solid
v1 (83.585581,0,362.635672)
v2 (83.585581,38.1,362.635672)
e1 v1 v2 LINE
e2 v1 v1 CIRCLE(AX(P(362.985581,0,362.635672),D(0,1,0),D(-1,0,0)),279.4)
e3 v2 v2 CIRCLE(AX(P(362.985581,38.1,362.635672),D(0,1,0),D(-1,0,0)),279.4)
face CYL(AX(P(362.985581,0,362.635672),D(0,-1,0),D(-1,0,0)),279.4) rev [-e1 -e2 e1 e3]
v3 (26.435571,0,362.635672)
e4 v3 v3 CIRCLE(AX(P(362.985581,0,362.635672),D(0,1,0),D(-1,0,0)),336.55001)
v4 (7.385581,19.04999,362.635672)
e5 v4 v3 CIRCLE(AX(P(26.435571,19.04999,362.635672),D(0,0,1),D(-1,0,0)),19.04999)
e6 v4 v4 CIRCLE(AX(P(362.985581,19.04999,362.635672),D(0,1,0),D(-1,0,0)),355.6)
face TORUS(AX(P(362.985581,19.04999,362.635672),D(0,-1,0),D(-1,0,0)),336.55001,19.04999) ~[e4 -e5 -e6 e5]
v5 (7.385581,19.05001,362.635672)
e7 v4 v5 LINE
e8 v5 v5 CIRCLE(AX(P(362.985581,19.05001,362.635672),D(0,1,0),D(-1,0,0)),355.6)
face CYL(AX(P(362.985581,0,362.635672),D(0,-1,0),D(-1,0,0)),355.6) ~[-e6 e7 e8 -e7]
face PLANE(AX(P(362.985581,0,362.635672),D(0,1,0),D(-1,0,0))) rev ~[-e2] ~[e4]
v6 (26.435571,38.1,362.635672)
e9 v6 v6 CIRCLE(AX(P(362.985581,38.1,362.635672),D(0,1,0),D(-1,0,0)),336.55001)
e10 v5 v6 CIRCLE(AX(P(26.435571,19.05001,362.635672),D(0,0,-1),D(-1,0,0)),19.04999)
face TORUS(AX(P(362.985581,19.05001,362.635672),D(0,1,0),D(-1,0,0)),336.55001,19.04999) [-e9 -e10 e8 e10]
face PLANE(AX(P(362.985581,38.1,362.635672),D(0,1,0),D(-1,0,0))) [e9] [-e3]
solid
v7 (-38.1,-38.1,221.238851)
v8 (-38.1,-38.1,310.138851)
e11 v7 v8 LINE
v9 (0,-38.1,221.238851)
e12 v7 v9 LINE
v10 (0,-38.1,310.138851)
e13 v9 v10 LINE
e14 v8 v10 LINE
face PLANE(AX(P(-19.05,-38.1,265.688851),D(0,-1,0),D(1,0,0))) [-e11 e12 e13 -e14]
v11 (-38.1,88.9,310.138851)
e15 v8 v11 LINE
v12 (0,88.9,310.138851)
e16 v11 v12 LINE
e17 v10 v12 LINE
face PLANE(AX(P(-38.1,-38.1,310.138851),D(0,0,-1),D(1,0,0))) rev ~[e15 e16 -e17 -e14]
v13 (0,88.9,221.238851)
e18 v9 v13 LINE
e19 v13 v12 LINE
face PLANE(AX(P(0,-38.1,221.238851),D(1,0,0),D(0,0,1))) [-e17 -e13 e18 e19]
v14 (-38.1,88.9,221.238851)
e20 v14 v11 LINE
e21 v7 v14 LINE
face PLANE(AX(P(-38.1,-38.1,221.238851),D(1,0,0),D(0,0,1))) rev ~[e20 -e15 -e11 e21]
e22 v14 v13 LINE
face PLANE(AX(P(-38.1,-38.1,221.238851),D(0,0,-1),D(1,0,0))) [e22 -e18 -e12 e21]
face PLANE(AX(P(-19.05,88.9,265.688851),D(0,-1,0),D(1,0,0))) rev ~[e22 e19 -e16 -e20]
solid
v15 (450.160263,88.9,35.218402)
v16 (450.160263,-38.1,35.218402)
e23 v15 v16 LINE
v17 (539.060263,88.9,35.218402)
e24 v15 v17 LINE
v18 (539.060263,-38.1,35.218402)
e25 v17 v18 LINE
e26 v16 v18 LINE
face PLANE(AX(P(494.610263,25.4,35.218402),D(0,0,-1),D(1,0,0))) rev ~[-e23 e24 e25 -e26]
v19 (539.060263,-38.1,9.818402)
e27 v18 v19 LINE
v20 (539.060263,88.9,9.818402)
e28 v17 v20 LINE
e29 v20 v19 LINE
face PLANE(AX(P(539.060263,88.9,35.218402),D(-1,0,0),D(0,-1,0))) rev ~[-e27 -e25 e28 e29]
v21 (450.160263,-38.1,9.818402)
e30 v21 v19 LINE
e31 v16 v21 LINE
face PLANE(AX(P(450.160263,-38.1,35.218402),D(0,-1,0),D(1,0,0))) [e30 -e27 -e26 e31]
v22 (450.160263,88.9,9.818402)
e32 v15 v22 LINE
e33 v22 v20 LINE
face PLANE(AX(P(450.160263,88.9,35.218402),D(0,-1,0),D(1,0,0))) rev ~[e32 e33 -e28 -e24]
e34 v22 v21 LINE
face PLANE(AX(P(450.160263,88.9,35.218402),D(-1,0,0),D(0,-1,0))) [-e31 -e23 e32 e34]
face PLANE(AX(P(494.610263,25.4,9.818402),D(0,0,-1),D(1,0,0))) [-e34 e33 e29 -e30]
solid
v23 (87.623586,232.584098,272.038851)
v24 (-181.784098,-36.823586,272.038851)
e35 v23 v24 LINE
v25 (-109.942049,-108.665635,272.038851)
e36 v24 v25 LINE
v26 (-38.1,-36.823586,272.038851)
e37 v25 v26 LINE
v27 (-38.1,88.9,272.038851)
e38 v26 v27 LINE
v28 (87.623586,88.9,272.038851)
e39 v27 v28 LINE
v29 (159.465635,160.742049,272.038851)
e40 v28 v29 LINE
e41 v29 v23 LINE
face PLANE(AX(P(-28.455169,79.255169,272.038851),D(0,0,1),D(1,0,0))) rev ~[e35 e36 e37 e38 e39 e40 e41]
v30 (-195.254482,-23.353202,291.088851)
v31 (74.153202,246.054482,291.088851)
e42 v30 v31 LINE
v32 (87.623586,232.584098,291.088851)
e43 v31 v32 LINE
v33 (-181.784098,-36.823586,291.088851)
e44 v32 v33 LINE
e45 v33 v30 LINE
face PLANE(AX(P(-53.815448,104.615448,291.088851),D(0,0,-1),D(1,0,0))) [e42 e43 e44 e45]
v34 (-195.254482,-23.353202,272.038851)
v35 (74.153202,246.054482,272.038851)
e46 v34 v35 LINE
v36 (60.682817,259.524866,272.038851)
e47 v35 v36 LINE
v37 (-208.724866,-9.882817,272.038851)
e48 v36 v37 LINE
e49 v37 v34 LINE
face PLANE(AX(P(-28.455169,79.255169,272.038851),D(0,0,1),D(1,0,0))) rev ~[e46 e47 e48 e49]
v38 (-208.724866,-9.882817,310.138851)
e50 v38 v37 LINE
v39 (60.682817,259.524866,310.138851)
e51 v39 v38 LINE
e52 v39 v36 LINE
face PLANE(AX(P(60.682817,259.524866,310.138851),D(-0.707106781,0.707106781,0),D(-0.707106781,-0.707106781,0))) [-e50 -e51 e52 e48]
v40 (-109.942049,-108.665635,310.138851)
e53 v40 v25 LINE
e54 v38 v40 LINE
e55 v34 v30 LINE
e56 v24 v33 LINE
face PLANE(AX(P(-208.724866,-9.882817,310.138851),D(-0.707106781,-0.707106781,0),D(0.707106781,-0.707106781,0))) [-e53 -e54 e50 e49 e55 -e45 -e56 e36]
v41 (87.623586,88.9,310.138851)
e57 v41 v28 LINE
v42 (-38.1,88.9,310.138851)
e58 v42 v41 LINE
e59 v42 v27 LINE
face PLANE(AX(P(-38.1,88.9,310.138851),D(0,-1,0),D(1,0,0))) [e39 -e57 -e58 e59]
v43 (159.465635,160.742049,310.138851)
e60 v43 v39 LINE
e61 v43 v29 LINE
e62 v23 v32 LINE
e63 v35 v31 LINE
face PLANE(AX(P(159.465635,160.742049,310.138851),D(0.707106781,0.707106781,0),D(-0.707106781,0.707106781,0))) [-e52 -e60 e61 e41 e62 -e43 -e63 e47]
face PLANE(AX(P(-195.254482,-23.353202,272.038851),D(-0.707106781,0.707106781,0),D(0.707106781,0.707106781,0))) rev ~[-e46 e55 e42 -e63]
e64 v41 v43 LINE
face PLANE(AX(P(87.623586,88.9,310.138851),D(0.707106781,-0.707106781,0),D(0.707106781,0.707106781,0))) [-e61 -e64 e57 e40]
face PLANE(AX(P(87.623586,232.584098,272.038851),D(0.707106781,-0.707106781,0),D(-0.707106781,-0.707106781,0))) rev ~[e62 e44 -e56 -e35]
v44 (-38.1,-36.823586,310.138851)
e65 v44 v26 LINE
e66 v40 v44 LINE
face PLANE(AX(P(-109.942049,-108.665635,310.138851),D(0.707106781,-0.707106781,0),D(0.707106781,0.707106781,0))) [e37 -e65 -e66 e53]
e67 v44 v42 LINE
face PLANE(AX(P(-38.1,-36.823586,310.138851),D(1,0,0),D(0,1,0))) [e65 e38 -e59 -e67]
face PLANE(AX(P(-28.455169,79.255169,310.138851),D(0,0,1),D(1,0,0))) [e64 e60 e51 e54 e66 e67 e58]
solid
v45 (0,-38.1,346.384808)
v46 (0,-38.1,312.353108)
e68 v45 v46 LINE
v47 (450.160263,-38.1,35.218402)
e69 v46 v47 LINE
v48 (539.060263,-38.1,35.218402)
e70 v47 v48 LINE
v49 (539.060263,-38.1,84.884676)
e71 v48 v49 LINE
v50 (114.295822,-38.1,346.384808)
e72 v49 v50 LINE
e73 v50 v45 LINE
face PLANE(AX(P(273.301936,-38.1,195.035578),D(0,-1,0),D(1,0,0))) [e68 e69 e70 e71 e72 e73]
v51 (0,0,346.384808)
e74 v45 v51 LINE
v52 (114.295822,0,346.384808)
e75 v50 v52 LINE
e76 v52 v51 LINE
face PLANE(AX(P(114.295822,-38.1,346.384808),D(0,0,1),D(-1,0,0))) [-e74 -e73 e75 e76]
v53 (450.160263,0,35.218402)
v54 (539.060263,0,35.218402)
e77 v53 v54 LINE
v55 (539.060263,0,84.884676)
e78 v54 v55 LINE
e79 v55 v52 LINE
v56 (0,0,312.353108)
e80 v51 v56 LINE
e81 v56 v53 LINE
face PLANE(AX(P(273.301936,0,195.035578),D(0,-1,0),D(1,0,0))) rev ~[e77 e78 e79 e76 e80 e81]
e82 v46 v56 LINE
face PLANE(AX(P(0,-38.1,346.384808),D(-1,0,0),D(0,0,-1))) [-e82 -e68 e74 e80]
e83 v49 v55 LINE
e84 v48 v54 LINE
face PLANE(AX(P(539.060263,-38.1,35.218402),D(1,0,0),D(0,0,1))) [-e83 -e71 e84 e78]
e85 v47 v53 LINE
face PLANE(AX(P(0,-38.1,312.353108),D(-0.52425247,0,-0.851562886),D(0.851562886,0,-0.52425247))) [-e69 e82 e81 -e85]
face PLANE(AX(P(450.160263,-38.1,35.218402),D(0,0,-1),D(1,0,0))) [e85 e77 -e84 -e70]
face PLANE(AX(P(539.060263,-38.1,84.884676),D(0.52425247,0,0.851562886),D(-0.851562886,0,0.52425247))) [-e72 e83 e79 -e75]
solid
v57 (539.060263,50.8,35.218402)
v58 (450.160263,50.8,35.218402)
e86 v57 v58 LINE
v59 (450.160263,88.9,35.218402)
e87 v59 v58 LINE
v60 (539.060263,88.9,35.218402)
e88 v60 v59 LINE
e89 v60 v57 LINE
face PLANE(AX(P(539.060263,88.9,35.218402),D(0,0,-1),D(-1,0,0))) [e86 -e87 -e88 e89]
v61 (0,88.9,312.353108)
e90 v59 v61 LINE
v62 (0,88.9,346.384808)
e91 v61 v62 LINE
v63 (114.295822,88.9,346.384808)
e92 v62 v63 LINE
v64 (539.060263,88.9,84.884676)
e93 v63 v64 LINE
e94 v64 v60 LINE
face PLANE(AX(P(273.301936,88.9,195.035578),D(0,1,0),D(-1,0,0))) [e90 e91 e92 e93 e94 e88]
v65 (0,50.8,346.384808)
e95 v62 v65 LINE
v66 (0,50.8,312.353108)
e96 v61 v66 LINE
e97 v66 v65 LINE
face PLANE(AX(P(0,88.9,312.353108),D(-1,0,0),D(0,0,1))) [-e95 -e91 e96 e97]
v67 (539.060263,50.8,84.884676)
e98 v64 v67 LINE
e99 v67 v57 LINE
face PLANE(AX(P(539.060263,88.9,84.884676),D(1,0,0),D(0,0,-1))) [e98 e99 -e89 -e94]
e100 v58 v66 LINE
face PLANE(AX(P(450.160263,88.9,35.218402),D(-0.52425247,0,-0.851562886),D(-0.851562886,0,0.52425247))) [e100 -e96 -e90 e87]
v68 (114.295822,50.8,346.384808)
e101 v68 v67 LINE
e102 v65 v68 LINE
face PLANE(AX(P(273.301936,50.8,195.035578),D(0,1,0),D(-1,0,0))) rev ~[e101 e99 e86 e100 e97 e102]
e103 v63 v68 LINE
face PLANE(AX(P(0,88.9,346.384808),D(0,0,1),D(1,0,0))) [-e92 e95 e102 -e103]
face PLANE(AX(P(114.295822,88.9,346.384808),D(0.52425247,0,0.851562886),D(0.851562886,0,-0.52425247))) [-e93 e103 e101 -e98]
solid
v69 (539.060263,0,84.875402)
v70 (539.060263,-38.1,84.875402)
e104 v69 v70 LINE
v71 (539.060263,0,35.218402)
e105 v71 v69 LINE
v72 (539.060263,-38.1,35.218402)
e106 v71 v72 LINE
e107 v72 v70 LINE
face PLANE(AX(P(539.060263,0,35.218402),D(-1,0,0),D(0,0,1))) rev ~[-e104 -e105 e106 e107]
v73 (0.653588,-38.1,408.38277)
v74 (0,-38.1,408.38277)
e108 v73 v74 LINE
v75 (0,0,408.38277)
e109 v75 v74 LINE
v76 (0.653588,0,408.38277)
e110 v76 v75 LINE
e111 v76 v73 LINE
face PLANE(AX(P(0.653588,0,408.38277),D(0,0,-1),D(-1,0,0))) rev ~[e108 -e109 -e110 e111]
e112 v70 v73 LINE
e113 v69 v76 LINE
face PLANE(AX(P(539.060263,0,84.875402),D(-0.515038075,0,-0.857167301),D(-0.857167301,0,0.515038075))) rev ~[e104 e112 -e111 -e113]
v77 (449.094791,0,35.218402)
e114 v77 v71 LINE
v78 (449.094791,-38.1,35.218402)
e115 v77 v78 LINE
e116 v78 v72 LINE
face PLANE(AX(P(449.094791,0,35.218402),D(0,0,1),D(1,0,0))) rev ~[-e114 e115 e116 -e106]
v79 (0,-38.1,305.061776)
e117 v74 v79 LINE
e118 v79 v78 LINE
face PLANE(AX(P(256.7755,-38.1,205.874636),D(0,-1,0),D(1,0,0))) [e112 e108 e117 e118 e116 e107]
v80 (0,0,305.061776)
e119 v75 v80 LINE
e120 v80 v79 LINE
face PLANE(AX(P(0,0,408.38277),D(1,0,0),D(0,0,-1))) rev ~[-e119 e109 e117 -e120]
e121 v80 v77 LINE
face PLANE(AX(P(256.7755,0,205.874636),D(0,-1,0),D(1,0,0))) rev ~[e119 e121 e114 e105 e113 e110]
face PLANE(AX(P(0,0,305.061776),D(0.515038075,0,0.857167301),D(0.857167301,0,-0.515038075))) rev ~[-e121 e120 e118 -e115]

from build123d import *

# Parameters (mm, degrees)
F1_DEPTH  = 38.1
F2_W      = 88.9
F2_H      = 127
F3_DEPTH  = 25.4
F5_W      = 38.1
F5_H      = 88.9
F6_DEPTH  = 127
F8_R      = 355.6
F8_R_2    = 279.4
F9_DEPTH  = 38.1
F10_R     = 19.04999
F12_DEPTH = 38.1
F14_DEPTH = 19.05
F16_DEPTH = 38.1
F19_DEPTH = 38.1


# Not quite as in the source:
# - a fillet or chamfer is up to 0.001 mm smaller than in the source, because OpenCascade refuses the exact size


with BuildPart() as f1:
    # F0 (on Front) → F1 (new body)
    with BuildSketch(Plane.XZ):
        Polygon((0, 305.0617762964), (449.0947908261, 35.2184022785), (539.0602625189, 35.2184022785), (539.0602625189, 84.8754022785), (0.6535882854, 408.382769847), (0, 408.382769847), align=None)
    extrude(amount=F1_DEPTH)


with BuildPart() as f3:
    # F2 (on face) → F3 (new body)
    with BuildSketch(Plane(origin=(0, 0, 35.2184022785), x_dir=(1, 0, 0), z_dir=(0, 0, -1))):
        with Locations((494.6102625189, -25.4)):
            Rectangle(F2_W, F2_H)
    extrude(amount=F3_DEPTH)


with BuildPart() as f6:
    # F5 (on face) → F6 (new body)
    with BuildSketch(Plane.XZ.offset(38.1)):
        with Locations((-19.05, 265.6888514042)):
            Rectangle(F5_W, F5_H)
    extrude(amount=-F6_DEPTH)


with BuildPart() as f9:
    # F8 (on face) → F9 (new body)
    with BuildSketch(Plane(origin=(0, 0, 0), x_dir=(-1, 0, 0), z_dir=(0, 1, 0))):
        with Locations((-362.9855811596, 362.6356720924)):
            Circle(F8_R)
        with Locations((-362.9855811596, 362.6356720924)):
            Circle(F8_R_2, mode=Mode.SUBTRACT)
    extrude(amount=F9_DEPTH)

    # F10 (radius 19.05 in the source; OpenCascade refuses exactly that, so slightly less here)
    f10_edges = [f9.edges().sort_by_distance(p)[0] for p in [
        (718.585581, 0, 362.635672),
        (718.585581, 38.1, 362.635672),
    ]]
    fillet(f10_edges, radius=F10_R)


with BuildPart() as f12:
    # F11 (on face) → F12 (new body)
    with BuildSketch(Plane.XY.offset(310.1388514042)):
        Polygon((60.6828173318, 259.5248663003), (-208.7248663003, -9.8828173318), (-109.9420489686, -108.6656346635), (-38.1, -36.823585695), (-38.1, 88.9), (87.623585695, 88.9), (159.4656346635, 160.7420489686), align=None)
    extrude(amount=-F12_DEPTH)

    # F13 (on face) → F14 (cut)
    with BuildSketch(Plane(origin=(0, 0, 272.0388514042), x_dir=(1, 0, 0), z_dir=(0, 0, -1))):
        Polygon((-181.7840979371, 36.823585695), (-195.2544821187, 23.3532015134), (74.1532015134, -246.0544821187), (87.623585695, -232.5840979371), align=None)
    extrude(amount=-F14_DEPTH, mode=Mode.SUBTRACT)


with BuildPart() as f16:
    # F15 (on face) → F16 (new body)
    with BuildSketch(Plane(origin=(0, 88.9, 0), x_dir=(-1, 0, 0), z_dir=(0, 1, 0))):
        Polygon((-539.0602625189, 84.8846760996), (-539.0602625189, 35.2184022785), (-450.1602625189, 35.2184022785), (0, 312.3531075877), (0, 346.3848079563), (-114.2958221575, 346.3848079563), align=None)
    extrude(amount=-F16_DEPTH)


with BuildPart() as f19:
    # F18 (on face) → F19 (new body)
    with BuildSketch(Plane.XZ.offset(38.1)):
        Polygon((539.0602625189, 35.2184022785), (539.0602625189, 84.8846760996), (114.2958221575, 346.3848079563), (0, 346.3848079563), (0, 312.3531075877), (450.1602625189, 35.2184022785), align=None)
    extrude(amount=-F19_DEPTH)


solid = Compound([f1.part, f3.part, f6.part, f9.part, f12.part, f16.part, f19.part])
